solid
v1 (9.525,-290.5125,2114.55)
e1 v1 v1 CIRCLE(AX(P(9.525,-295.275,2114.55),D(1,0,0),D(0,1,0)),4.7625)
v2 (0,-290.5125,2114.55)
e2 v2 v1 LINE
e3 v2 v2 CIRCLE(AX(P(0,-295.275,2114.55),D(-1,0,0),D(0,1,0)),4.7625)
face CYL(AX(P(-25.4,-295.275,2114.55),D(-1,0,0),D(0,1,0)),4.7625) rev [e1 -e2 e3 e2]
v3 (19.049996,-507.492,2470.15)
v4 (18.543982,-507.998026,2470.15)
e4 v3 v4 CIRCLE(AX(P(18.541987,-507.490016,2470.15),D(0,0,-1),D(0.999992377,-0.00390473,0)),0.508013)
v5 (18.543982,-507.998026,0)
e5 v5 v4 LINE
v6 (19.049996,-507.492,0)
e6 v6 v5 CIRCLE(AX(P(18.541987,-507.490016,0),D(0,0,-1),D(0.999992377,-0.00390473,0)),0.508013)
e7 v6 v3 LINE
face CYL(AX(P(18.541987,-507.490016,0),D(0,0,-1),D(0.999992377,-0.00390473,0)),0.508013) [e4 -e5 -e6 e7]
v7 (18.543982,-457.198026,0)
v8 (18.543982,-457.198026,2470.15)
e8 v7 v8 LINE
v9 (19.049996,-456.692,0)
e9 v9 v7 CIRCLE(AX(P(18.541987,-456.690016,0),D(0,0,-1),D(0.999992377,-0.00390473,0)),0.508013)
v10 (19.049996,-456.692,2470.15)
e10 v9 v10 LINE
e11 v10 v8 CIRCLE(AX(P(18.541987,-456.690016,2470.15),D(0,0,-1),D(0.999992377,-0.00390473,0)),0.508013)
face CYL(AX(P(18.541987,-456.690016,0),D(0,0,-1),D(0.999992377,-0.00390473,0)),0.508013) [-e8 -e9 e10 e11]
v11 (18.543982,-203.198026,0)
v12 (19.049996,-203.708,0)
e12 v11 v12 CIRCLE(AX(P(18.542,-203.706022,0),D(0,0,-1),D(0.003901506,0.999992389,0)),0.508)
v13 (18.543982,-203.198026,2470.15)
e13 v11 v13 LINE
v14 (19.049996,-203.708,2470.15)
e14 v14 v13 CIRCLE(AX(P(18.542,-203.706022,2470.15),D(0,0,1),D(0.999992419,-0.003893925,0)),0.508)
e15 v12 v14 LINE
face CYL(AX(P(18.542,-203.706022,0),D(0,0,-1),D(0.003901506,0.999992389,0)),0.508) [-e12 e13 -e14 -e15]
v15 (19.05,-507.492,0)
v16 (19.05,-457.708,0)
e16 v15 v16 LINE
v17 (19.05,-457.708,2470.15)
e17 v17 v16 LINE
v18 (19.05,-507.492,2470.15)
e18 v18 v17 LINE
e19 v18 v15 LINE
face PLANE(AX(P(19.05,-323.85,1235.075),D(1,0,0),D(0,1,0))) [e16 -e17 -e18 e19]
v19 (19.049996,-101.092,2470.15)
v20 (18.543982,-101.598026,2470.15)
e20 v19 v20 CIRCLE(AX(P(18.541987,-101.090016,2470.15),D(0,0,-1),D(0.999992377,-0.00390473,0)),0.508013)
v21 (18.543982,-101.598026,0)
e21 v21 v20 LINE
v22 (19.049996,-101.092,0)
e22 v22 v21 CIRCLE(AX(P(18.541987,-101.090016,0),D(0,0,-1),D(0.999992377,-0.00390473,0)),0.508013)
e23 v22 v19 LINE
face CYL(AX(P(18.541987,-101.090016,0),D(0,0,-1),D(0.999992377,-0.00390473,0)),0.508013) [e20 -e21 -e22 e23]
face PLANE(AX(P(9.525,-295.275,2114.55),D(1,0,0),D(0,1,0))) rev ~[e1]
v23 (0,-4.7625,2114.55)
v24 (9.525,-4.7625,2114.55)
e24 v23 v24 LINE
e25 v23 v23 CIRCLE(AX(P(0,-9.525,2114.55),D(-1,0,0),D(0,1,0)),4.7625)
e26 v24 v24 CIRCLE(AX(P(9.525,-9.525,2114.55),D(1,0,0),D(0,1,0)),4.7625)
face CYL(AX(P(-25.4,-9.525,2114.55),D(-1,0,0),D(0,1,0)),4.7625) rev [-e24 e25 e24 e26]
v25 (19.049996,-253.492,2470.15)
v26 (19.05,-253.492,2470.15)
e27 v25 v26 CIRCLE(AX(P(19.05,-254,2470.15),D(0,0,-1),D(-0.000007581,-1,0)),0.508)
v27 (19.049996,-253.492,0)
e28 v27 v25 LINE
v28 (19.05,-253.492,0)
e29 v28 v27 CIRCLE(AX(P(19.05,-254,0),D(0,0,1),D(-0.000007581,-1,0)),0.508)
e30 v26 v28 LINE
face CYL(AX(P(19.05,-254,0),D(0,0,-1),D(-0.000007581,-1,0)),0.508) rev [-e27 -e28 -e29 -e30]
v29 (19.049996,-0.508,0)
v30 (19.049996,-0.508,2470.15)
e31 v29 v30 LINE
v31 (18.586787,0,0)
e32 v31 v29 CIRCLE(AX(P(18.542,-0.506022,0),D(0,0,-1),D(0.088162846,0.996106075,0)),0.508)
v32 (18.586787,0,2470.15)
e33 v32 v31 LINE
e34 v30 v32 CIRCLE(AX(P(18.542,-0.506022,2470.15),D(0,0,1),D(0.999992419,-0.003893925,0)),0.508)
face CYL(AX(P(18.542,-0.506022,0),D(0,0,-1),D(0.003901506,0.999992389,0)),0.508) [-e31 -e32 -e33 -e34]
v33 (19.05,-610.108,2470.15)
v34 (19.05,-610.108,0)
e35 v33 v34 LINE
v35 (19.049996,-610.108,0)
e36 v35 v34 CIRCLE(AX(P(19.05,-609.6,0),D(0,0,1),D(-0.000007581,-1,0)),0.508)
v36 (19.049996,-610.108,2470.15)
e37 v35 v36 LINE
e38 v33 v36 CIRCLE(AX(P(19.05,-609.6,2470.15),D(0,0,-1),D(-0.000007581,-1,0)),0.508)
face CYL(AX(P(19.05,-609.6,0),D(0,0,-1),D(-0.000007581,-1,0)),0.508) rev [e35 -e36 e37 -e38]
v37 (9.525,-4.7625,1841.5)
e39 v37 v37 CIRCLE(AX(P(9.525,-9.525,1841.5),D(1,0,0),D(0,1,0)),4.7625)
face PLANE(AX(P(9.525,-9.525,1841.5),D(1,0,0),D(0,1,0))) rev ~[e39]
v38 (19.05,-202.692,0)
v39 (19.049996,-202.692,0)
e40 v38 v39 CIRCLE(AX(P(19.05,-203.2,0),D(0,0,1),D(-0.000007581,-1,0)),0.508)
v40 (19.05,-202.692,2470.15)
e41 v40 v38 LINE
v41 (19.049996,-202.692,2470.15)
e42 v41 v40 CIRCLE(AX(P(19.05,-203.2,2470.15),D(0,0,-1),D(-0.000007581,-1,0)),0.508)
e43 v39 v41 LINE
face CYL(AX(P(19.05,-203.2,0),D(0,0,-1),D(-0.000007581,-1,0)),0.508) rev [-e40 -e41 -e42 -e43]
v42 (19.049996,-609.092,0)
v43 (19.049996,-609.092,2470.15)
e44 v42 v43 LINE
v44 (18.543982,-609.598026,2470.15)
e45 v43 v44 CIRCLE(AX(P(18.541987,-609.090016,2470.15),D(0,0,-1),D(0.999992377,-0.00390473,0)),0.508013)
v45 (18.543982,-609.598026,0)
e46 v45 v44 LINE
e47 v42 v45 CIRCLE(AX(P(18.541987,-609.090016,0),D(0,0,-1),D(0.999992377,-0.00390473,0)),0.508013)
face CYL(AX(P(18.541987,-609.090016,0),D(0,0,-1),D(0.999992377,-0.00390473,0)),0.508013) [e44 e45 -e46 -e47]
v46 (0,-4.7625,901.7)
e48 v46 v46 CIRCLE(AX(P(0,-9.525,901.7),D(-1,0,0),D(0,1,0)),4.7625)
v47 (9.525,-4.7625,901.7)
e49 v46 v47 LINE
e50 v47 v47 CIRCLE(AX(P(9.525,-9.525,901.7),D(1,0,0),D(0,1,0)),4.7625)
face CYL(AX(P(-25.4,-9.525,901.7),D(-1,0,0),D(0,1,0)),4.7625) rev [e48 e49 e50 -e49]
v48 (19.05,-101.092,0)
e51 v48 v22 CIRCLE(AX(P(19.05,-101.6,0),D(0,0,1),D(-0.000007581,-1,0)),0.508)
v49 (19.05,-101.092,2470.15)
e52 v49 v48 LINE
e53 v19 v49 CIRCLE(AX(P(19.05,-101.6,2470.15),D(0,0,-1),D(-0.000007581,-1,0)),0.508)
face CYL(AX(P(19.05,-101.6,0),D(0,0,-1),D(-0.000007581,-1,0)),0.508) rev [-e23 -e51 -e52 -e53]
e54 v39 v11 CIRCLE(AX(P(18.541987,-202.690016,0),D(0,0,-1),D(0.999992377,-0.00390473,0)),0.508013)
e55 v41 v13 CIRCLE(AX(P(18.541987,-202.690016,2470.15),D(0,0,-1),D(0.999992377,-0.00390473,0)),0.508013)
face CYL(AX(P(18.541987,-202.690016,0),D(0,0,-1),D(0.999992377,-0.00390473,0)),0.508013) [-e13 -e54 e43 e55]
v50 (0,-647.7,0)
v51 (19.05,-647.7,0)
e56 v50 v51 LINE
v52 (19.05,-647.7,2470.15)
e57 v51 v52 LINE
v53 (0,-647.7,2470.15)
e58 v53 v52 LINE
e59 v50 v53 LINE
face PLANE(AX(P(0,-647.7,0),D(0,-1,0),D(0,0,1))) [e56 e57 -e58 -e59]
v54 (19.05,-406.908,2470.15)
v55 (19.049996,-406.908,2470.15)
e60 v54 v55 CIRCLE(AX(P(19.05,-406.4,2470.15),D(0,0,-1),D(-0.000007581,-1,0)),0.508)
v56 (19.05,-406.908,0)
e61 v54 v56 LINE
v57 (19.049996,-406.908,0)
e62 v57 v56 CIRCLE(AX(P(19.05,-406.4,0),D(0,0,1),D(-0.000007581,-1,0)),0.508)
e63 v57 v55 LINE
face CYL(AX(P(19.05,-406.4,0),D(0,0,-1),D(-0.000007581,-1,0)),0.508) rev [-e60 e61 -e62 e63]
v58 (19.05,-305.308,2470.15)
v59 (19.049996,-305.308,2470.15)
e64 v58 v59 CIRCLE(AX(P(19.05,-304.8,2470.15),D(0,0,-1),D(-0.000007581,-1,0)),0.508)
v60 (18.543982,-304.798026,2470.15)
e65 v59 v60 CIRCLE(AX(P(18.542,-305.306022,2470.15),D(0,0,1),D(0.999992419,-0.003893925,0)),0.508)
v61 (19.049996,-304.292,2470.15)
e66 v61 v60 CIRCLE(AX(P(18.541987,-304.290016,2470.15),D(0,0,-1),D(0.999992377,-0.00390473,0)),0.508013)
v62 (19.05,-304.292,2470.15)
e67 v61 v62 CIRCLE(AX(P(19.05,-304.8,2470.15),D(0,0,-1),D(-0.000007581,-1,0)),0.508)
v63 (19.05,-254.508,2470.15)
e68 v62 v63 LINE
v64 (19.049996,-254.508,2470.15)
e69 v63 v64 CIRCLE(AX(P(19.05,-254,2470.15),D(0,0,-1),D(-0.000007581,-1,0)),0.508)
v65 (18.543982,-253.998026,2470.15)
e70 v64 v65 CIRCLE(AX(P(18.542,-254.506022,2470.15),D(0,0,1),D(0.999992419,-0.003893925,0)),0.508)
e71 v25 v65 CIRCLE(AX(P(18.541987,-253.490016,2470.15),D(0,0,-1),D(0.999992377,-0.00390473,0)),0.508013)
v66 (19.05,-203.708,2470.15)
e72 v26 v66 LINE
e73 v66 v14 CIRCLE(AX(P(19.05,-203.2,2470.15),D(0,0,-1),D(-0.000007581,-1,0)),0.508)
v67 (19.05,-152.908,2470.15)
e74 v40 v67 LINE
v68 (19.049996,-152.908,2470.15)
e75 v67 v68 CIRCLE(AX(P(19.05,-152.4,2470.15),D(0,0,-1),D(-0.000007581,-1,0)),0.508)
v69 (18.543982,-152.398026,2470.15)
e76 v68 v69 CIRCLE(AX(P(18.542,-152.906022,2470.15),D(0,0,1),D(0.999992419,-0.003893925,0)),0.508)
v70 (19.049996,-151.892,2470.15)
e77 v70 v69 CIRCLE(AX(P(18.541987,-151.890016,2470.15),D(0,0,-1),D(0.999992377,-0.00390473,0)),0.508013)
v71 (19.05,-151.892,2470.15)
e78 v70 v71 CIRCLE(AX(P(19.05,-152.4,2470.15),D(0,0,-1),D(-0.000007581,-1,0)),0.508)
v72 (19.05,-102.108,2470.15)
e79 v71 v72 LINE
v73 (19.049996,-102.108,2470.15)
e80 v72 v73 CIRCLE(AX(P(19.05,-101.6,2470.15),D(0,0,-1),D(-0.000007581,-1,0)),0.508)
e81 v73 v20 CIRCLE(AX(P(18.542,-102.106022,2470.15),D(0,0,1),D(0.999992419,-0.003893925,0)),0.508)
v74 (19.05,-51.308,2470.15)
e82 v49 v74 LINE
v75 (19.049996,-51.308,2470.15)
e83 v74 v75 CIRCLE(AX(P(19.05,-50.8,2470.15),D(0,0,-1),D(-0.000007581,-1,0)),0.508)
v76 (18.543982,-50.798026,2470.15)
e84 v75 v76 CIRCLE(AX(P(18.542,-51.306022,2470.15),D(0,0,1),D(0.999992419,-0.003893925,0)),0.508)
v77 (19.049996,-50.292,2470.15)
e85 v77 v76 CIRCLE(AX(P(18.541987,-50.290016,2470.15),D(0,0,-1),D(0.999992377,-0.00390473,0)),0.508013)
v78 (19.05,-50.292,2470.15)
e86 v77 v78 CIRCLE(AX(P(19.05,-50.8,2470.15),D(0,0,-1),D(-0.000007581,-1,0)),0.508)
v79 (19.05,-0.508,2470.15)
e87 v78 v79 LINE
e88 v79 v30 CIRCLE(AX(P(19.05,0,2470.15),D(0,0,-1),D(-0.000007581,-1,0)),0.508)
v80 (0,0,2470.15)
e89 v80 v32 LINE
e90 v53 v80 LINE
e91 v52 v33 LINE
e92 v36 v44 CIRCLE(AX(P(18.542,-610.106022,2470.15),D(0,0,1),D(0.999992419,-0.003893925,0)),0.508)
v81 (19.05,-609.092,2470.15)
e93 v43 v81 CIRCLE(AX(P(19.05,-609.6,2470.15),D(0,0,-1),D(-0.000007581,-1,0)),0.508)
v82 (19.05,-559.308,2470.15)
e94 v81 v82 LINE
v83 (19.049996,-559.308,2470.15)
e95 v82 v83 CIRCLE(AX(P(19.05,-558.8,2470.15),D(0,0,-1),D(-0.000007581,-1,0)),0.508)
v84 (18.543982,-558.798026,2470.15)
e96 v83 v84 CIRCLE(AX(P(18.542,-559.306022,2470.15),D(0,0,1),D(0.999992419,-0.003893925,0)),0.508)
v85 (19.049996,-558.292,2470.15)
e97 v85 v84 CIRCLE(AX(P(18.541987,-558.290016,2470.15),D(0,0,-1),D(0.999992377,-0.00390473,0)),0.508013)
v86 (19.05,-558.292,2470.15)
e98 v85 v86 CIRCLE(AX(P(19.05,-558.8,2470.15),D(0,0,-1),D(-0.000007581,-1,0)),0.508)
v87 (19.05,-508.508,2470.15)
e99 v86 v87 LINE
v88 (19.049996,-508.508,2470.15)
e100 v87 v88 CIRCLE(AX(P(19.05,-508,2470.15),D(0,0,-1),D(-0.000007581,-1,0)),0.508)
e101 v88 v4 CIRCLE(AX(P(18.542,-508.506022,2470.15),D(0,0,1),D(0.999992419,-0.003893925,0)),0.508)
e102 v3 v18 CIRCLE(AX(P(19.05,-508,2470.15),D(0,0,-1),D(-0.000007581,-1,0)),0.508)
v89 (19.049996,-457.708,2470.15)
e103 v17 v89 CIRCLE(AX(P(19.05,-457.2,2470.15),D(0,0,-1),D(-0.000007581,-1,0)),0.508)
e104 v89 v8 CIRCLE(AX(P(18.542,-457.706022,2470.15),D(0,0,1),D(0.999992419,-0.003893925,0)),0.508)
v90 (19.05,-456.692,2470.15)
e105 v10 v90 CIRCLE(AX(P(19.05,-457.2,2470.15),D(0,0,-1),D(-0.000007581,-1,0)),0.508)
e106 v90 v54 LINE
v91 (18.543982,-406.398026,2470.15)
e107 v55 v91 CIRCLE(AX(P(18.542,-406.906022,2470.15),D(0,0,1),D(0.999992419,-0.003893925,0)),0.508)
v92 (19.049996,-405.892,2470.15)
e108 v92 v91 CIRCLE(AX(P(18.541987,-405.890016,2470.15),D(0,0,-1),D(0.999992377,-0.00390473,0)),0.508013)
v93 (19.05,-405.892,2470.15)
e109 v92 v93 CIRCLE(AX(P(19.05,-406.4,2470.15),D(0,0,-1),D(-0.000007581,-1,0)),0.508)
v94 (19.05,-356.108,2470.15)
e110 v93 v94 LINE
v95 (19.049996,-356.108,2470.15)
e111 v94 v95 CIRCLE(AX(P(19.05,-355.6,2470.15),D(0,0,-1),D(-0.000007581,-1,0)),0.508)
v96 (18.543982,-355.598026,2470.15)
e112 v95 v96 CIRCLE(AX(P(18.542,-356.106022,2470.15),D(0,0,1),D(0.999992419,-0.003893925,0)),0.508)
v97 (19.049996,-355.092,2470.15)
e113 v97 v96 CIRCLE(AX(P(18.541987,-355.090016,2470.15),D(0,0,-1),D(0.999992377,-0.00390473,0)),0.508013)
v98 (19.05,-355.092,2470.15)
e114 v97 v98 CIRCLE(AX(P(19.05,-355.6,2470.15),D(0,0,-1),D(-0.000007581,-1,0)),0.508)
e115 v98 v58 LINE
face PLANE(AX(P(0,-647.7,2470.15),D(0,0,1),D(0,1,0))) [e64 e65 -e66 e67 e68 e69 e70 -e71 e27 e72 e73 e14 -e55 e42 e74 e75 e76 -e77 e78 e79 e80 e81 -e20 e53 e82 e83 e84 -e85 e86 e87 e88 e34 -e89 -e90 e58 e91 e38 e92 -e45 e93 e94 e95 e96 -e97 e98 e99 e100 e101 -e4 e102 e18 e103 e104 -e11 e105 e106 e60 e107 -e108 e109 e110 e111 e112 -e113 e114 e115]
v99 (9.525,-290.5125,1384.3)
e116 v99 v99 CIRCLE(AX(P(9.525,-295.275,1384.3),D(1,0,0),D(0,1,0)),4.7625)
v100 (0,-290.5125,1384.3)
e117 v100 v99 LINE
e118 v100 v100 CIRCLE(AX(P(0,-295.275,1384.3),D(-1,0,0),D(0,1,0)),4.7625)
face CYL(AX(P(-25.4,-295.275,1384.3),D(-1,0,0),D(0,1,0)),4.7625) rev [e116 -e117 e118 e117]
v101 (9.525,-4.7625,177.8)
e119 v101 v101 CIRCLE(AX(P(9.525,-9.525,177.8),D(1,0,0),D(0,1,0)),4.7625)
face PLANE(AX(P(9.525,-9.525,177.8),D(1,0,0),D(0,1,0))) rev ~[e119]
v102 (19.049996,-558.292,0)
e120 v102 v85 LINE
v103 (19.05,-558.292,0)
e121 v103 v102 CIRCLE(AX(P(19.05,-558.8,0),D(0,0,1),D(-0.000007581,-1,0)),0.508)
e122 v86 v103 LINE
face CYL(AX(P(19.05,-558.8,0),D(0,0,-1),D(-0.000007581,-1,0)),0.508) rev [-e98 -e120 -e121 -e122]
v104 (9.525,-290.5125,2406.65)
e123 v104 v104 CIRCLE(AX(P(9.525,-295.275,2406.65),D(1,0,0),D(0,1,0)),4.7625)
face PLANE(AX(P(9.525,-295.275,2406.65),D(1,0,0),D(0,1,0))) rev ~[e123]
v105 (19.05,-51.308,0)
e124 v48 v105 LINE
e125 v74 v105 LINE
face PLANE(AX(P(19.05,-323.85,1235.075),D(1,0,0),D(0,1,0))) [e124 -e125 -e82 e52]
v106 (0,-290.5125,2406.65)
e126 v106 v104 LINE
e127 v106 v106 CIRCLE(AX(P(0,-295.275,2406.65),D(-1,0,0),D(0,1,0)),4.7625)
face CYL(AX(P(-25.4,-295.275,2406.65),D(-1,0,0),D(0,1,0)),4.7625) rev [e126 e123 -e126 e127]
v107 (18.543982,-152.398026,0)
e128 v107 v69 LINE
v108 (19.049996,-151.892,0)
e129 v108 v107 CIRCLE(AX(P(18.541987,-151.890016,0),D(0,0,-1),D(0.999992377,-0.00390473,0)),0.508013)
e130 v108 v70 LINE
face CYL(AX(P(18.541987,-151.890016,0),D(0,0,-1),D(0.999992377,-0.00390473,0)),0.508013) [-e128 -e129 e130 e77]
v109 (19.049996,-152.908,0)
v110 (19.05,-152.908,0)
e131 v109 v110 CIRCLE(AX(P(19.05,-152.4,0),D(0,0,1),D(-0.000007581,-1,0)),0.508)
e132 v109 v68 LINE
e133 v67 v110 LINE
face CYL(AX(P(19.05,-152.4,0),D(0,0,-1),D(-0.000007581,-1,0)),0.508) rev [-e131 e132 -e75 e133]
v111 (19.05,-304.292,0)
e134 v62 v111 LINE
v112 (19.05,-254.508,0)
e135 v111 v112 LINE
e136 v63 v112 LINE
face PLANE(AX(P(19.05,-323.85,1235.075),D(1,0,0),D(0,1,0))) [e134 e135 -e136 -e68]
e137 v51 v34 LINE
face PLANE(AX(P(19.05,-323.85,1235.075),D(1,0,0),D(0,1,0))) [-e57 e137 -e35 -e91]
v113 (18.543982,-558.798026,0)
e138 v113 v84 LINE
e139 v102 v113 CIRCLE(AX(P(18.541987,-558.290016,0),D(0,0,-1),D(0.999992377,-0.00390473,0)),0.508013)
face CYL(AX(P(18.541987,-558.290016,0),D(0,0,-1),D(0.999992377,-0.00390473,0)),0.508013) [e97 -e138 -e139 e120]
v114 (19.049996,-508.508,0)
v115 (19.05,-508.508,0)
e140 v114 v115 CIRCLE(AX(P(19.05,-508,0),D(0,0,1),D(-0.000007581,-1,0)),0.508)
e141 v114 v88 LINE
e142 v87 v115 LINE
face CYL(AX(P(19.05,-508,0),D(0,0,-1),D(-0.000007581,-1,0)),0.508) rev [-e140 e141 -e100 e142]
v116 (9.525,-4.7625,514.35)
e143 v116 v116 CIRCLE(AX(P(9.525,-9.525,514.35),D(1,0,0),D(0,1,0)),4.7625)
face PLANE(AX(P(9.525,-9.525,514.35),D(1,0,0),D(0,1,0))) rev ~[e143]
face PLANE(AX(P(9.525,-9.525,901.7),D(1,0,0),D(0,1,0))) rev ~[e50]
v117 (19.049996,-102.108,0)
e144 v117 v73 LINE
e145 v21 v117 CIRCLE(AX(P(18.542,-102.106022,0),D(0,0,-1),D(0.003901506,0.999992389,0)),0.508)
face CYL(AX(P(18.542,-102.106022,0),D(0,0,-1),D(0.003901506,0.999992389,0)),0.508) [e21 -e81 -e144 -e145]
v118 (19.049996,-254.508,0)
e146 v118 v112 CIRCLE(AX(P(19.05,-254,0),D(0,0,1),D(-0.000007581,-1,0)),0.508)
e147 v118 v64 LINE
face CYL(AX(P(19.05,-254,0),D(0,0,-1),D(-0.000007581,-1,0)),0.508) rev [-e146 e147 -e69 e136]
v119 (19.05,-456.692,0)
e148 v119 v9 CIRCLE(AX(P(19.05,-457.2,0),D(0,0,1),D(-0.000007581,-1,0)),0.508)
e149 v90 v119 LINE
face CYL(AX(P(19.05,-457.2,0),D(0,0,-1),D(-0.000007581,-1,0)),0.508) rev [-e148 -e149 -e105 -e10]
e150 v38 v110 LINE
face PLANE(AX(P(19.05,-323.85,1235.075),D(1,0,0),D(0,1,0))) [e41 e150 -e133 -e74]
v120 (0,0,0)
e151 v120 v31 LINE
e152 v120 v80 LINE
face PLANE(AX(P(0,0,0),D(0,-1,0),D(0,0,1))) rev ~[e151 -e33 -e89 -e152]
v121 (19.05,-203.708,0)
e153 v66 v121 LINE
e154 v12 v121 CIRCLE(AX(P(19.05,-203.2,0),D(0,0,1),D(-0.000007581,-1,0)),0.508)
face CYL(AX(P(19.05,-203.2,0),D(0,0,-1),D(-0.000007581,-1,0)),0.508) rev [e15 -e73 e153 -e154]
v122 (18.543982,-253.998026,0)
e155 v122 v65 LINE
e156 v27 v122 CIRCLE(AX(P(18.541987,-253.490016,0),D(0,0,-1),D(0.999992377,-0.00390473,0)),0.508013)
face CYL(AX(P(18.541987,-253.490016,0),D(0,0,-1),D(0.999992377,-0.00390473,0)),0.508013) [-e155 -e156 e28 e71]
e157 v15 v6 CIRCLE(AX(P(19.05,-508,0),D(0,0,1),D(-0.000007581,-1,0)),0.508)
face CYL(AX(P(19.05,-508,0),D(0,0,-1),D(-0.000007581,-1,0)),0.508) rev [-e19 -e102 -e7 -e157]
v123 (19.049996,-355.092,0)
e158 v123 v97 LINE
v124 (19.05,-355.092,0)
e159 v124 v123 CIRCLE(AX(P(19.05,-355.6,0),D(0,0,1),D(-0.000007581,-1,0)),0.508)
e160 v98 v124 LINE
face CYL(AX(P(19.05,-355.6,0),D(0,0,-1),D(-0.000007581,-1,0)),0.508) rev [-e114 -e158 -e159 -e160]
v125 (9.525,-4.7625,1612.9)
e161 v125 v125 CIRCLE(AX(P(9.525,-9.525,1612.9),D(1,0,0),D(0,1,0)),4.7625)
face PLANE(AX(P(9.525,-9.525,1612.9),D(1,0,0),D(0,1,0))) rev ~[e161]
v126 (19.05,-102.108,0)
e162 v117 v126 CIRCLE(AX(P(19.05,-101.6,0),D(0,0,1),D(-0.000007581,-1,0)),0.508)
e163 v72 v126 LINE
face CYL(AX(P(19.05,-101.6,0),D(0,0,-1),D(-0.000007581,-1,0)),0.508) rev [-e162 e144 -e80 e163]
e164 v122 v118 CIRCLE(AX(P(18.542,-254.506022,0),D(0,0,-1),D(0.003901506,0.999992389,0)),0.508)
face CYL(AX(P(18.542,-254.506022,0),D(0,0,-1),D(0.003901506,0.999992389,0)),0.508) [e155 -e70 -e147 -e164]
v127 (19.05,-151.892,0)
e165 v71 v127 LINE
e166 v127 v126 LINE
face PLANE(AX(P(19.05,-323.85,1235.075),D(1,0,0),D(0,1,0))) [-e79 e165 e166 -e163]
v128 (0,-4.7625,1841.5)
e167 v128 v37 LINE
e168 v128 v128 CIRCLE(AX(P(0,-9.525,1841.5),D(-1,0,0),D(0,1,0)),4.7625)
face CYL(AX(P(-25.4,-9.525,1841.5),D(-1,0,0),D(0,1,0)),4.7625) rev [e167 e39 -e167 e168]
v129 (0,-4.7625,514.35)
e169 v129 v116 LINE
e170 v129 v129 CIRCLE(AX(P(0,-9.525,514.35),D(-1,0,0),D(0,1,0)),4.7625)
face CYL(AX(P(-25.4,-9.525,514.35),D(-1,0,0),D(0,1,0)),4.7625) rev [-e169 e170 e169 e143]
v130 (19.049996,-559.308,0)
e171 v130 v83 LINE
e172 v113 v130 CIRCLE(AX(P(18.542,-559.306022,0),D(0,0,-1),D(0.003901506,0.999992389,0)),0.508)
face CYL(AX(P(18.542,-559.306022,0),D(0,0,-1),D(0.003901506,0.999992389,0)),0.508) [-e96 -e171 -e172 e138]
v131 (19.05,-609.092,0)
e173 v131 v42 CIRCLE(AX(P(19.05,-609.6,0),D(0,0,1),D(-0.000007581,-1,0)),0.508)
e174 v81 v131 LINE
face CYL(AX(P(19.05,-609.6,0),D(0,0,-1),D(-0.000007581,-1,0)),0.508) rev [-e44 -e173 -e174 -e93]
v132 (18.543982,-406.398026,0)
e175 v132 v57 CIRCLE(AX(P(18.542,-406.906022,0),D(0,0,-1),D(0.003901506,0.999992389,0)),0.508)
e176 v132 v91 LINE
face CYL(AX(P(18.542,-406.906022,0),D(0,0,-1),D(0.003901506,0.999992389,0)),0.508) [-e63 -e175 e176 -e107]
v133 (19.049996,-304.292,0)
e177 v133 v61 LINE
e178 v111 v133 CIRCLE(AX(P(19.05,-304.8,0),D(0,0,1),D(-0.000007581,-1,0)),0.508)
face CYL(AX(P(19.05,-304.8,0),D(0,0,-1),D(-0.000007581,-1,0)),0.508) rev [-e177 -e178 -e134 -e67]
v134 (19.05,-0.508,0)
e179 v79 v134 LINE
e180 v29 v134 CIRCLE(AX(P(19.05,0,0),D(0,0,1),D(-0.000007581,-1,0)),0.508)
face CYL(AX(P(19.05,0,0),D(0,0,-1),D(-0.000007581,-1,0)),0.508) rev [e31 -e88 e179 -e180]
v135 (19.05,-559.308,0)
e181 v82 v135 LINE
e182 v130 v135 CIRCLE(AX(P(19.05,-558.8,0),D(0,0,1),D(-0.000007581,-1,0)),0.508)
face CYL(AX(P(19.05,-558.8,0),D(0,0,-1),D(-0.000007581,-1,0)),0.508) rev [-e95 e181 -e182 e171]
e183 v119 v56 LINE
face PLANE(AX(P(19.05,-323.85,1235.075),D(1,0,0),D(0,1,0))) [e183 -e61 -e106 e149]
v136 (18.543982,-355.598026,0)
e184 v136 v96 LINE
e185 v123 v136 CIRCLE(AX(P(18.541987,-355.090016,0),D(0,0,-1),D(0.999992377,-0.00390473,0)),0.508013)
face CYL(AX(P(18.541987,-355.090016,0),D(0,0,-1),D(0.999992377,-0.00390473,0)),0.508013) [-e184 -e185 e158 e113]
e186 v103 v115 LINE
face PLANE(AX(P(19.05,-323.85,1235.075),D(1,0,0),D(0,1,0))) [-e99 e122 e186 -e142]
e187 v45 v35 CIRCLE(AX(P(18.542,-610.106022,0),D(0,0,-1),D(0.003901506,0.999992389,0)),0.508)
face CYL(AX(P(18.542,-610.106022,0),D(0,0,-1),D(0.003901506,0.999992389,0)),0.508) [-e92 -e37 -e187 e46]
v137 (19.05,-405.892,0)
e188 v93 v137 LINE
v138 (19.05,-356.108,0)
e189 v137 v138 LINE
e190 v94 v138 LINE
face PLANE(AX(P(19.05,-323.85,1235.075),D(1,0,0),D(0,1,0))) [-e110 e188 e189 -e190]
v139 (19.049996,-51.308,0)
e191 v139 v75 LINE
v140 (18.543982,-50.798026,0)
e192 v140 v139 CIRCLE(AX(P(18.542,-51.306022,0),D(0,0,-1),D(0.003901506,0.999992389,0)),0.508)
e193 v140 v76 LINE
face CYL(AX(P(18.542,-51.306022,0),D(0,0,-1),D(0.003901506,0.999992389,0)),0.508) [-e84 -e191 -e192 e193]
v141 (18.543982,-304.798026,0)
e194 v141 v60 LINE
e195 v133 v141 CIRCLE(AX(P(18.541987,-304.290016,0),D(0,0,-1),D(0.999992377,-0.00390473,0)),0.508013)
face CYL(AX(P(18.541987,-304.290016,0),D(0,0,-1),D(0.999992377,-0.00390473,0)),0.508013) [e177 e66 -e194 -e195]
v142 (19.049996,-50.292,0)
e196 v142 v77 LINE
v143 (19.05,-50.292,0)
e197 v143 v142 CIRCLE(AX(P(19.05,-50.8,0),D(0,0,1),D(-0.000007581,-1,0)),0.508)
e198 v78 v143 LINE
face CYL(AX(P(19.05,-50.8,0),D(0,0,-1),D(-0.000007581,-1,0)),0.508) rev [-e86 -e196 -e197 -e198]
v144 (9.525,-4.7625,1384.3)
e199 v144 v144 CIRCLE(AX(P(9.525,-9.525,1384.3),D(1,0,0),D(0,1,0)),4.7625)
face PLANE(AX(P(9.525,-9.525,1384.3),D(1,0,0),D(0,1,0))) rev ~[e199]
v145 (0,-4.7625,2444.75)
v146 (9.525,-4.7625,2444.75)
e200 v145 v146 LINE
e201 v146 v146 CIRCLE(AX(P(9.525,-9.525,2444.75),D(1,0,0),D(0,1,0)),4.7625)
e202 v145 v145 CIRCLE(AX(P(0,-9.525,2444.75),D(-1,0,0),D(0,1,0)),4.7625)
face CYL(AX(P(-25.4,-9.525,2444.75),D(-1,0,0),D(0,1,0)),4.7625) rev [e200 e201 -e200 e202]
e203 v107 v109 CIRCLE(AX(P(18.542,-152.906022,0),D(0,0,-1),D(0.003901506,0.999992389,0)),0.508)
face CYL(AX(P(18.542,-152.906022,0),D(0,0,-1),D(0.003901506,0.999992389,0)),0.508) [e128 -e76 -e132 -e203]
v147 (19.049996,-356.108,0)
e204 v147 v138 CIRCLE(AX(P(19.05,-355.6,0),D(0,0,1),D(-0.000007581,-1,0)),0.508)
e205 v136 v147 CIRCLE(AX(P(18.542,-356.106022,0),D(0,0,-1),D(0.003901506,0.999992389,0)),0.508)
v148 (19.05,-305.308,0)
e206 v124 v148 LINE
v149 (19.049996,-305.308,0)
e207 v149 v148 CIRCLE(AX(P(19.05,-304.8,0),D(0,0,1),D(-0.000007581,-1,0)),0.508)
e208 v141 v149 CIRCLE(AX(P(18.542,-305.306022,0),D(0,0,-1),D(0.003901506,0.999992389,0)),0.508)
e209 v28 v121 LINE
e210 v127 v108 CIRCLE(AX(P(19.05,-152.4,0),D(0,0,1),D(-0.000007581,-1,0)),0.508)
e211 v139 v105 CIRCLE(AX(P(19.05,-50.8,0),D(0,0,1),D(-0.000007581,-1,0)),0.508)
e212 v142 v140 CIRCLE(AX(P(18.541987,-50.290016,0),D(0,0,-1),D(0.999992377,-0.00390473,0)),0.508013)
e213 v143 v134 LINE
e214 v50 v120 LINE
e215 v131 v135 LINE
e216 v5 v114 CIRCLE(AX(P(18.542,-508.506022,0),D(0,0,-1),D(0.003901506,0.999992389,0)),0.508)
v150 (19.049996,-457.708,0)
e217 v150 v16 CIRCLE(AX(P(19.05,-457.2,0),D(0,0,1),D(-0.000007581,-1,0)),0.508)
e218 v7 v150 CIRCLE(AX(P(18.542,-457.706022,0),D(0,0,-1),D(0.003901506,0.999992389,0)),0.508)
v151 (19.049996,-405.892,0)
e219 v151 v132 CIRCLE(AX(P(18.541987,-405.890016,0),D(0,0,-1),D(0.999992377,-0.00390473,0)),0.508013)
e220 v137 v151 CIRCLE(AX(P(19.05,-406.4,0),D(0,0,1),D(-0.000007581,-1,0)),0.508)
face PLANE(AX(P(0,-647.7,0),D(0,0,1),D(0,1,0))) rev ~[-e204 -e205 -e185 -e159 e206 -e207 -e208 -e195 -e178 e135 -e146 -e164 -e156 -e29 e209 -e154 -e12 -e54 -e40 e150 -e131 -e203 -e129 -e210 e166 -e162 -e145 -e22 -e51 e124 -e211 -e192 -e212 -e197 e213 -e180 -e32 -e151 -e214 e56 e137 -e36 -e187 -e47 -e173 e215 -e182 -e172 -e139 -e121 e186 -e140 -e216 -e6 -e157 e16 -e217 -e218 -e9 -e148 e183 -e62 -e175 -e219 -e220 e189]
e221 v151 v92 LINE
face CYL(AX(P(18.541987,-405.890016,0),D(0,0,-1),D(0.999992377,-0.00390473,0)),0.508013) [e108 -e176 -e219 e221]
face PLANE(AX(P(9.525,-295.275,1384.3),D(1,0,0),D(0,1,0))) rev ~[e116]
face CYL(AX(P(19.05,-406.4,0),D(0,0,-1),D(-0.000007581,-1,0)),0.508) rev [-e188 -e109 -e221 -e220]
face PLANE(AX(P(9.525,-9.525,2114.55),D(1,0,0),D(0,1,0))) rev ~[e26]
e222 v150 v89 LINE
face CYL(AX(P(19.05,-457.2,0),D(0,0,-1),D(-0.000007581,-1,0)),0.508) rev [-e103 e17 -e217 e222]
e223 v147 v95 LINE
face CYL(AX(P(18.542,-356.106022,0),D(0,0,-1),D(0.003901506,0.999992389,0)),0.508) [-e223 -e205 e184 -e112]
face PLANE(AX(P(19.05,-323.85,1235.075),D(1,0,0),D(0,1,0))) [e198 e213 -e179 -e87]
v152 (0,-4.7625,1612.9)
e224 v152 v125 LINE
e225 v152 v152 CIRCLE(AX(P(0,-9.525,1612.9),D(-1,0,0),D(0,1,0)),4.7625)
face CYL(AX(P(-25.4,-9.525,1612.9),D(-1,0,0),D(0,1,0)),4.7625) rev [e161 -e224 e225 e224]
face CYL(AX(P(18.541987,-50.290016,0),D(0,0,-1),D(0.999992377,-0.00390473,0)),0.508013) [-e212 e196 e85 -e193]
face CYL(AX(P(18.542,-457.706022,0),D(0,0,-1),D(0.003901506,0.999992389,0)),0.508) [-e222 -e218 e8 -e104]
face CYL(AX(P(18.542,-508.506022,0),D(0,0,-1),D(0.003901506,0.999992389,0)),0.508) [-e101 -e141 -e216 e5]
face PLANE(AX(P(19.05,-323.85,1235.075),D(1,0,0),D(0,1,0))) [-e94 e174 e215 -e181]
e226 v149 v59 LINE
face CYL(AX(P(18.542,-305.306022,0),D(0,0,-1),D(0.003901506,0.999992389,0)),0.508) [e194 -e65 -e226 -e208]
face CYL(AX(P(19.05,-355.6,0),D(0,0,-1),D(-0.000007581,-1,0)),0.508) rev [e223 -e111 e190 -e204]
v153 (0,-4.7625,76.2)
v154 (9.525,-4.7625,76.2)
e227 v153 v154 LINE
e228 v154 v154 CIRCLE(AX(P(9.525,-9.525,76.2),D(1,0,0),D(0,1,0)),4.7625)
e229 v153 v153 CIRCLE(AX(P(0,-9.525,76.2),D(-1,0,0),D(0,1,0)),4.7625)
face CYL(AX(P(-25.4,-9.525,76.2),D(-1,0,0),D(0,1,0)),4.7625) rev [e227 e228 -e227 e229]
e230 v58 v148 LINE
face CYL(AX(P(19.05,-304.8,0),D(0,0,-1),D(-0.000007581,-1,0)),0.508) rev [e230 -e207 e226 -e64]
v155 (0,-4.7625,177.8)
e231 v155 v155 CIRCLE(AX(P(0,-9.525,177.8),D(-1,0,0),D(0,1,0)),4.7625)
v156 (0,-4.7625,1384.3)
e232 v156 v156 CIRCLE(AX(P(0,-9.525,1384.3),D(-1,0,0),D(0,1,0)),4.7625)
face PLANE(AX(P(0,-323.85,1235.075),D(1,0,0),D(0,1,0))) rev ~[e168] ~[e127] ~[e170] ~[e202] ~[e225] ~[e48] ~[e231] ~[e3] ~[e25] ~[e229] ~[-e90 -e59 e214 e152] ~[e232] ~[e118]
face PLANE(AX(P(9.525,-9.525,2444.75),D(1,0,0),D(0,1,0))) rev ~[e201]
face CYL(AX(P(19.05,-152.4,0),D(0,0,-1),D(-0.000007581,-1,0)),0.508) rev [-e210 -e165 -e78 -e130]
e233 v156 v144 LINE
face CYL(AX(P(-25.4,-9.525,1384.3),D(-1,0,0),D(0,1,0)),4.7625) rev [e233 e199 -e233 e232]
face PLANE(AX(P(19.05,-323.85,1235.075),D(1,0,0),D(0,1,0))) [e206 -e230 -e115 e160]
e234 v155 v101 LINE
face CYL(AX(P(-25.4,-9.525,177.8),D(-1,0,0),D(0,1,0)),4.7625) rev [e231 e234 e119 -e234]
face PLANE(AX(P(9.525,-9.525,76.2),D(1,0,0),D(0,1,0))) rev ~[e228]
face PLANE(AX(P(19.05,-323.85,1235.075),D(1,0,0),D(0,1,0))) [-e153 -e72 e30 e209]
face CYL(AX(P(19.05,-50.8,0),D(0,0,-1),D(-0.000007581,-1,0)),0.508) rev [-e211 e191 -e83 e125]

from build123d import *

# Parameters (mm, degrees)
F0_W     = 647.7
F0_H     = 2470.15
F1_DEPTH = 19.05
F3_R     = 4.7625
F4_DEPTH = 34.925
F6_DEPTH = 2540


# Not quite as in the source:
# - ends of sketch curves that miss each other by under 0.0002 mm in the source are joined


with BuildPart() as f1:
    # F0 (on Right) → F1 (new body)
    with BuildSketch(Plane.YZ):
        with Locations((-323.85, 1235.075)):
            Rectangle(F0_W, F0_H)
    extrude(amount=F1_DEPTH)

    # F3 (on offset) → F4 (cut)
    with BuildSketch(Plane.YZ.offset(-25.4)):
        with Locations((-9.525, 76.2)):
            Circle(F3_R)
        with Locations((-295.275, 1384.3)):
            Circle(F3_R)
        with Locations((-295.275, 2114.55)):
            Circle(F3_R)
        with Locations((-295.275, 2406.65)):
            Circle(F3_R)
        with Locations((-9.525, 2444.75)):
            Circle(F3_R)
        with Locations((-9.525, 2114.55)):
            Circle(F3_R)
        with Locations((-9.525, 1384.3)):
            Circle(F3_R)
        with Locations((-9.525, 901.7)):
            Circle(F3_R)
        with Locations((-9.525, 177.8)):
            Circle(F3_R)
        with Locations((-9.525, 514.35)):
            Circle(F3_R)
        with Locations((-9.525, 1612.9)):
            Circle(F3_R)
        with Locations((-9.525, 1841.5)):
            Circle(F3_R)
    extrude(amount=F4_DEPTH, mode=Mode.SUBTRACT)

    # F5 (on Top) → F6 (cut)
    with BuildSketch(Plane.XY):
        with BuildLine():
            ThreePointArc((18.5439819652, 50.8019742476), (18.9026076156, 50.6517855308), (19.0499961487, 50.292))
            ThreePointArc((19.0499961487, 50.292), (19.558, 50.8), (19.0499961487, 51.308))
            ThreePointArc((19.0499961487, 51.308), (18.9012115958, 50.95076922), (18.5439819652, 50.8019742476))
        make_face()
        with BuildLine():
            ThreePointArc((18.5439819652, 0.0019742476), (18.9026076156, -0.1482144692), (19.0499961487, -0.508))
            ThreePointArc((19.0499961487, -0.508), (19.558, 0), (19.0499961487, 0.508))
            ThreePointArc((19.0499961487, 0.508), (18.9012115958, 0.15076922), (18.5439819652, 0.0019742476))
        make_face()
        with BuildLine():
            ThreePointArc((18.5439819652, -50.7980257524), (18.9026076156, -50.9482144692), (19.0499961487, -51.308))
            ThreePointArc((19.0499961487, -51.308), (19.558, -50.8), (19.0499961487, -50.292))
            ThreePointArc((19.0499961487, -50.292), (18.9012115958, -50.64923078), (18.5439819652, -50.7980257524))
        make_face()
        with BuildLine():
            ThreePointArc((18.5439819652, -101.5980257524), (18.9026076156, -101.7482144692), (19.0499961487, -102.108))
            ThreePointArc((19.0499961487, -102.108), (19.558, -101.6), (19.0499961487, -101.092))
            ThreePointArc((19.0499961487, -101.092), (18.9012115958, -101.44923078), (18.5439819652, -101.5980257524))
        make_face()
        with BuildLine():
            ThreePointArc((18.5439819652, -152.3980257524), (18.9026076156, -152.5482144692), (19.0499961487, -152.908))
            ThreePointArc((19.0499961487, -152.908), (19.558, -152.4), (19.0499961487, -151.892))
            ThreePointArc((19.0499961487, -151.892), (18.9012115958, -152.24923078), (18.5439819652, -152.3980257524))
        make_face()
        with BuildLine():
            ThreePointArc((18.5439819652, -203.1980257524), (18.9026076156, -203.3482144692), (19.0499961487, -203.708))
            ThreePointArc((19.0499961487, -203.708), (19.558, -203.2), (19.0499961487, -202.692))
            ThreePointArc((19.0499961487, -202.692), (18.9012115958, -203.04923078), (18.5439819652, -203.1980257524))
        make_face()
        with BuildLine():
            ThreePointArc((18.5439819652, -253.9980257524), (18.9026076156, -254.1482144692), (19.0499961487, -254.508))
            ThreePointArc((19.0499961487, -254.508), (19.558, -254), (19.0499961487, -253.492))
            ThreePointArc((19.0499961487, -253.492), (18.9012115958, -253.84923078), (18.5439819652, -253.9980257524))
        make_face()
        with BuildLine():
            ThreePointArc((18.5439819652, -304.7980257524), (18.9026076156, -304.9482144692), (19.0499961487, -305.308))
            ThreePointArc((19.0499961487, -305.308), (19.558, -304.8), (19.0499961487, -304.292))
            ThreePointArc((19.0499961487, -304.292), (18.9012115958, -304.64923078), (18.5439819652, -304.7980257524))
        make_face()
        with BuildLine():
            ThreePointArc((18.5439819652, -355.5980257524), (18.9026076156, -355.7482144692), (19.0499961487, -356.108))
            ThreePointArc((19.0499961487, -356.108), (19.558, -355.6), (19.0499961487, -355.092))
            ThreePointArc((19.0499961487, -355.092), (18.9012115958, -355.44923078), (18.5439819652, -355.5980257524))
        make_face()
        with BuildLine():
            ThreePointArc((18.5439819652, -406.3980257524), (18.9026076156, -406.5482144692), (19.0499961487, -406.908))
            ThreePointArc((19.0499961487, -406.908), (19.558, -406.4), (19.0499961487, -405.892))
            ThreePointArc((19.0499961487, -405.892), (18.9012115958, -406.24923078), (18.5439819652, -406.3980257524))
        make_face()
        with BuildLine():
            ThreePointArc((18.5439819652, -457.1980257524), (18.9026076156, -457.3482144692), (19.0499961487, -457.708))
            ThreePointArc((19.0499961487, -457.708), (19.558, -457.2), (19.0499961487, -456.692))
            ThreePointArc((19.0499961487, -456.692), (18.9012115958, -457.04923078), (18.5439819652, -457.1980257524))
        make_face()
        with BuildLine():
            ThreePointArc((18.5439819652, -507.9980257524), (18.9026076156, -508.1482144692), (19.0499961487, -508.508))
            ThreePointArc((19.0499961487, -508.508), (19.558, -508), (19.0499961487, -507.492))
            ThreePointArc((19.0499961487, -507.492), (18.9012115958, -507.84923078), (18.5439819652, -507.9980257524))
        make_face()
        with BuildLine():
            ThreePointArc((18.5439819652, -558.7980257524), (18.9026076156, -558.9482144692), (19.0499961487, -559.308))
            ThreePointArc((19.0499961487, -559.308), (19.558, -558.8), (19.0499961487, -558.292))
            ThreePointArc((19.0499961487, -558.292), (18.9012115958, -558.64923078), (18.5439819652, -558.7980257524))
        make_face()
        with BuildLine():
            ThreePointArc((18.5439819652, -609.5980257524), (18.9026076156, -609.7482144692), (19.0499961487, -610.108))
            ThreePointArc((19.0499961487, -610.108), (19.558, -609.6), (19.0499961487, -609.092))
            ThreePointArc((19.0499961487, -609.092), (18.9012115958, -609.44923078), (18.5439819652, -609.5980257524))
        make_face()
        with BuildLine():
            ThreePointArc((18.5439819652, -660.3980257524), (18.9026076156, -660.5482144692), (19.0499961487, -660.908))
            ThreePointArc((19.0499961487, -660.908), (19.558, -660.4), (19.0499961487, -659.892))
            ThreePointArc((19.0499961487, -659.892), (18.9012115958, -660.24923078), (18.5439819652, -660.3980257524))
        make_face()
        with BuildLine():
            ThreePointArc((18.5439819652, -711.1980257524), (18.9026076156, -711.3482144692), (19.0499961487, -711.708))
            ThreePointArc((19.0499961487, -711.708), (19.558, -711.2), (19.0499961487, -710.692))
            ThreePointArc((19.0499961487, -710.692), (18.9012115958, -711.04923078), (18.5439819652, -711.1980257524))
        make_face()
    extrude(amount=F6_DEPTH, mode=Mode.SUBTRACT)


solid = f1.part
